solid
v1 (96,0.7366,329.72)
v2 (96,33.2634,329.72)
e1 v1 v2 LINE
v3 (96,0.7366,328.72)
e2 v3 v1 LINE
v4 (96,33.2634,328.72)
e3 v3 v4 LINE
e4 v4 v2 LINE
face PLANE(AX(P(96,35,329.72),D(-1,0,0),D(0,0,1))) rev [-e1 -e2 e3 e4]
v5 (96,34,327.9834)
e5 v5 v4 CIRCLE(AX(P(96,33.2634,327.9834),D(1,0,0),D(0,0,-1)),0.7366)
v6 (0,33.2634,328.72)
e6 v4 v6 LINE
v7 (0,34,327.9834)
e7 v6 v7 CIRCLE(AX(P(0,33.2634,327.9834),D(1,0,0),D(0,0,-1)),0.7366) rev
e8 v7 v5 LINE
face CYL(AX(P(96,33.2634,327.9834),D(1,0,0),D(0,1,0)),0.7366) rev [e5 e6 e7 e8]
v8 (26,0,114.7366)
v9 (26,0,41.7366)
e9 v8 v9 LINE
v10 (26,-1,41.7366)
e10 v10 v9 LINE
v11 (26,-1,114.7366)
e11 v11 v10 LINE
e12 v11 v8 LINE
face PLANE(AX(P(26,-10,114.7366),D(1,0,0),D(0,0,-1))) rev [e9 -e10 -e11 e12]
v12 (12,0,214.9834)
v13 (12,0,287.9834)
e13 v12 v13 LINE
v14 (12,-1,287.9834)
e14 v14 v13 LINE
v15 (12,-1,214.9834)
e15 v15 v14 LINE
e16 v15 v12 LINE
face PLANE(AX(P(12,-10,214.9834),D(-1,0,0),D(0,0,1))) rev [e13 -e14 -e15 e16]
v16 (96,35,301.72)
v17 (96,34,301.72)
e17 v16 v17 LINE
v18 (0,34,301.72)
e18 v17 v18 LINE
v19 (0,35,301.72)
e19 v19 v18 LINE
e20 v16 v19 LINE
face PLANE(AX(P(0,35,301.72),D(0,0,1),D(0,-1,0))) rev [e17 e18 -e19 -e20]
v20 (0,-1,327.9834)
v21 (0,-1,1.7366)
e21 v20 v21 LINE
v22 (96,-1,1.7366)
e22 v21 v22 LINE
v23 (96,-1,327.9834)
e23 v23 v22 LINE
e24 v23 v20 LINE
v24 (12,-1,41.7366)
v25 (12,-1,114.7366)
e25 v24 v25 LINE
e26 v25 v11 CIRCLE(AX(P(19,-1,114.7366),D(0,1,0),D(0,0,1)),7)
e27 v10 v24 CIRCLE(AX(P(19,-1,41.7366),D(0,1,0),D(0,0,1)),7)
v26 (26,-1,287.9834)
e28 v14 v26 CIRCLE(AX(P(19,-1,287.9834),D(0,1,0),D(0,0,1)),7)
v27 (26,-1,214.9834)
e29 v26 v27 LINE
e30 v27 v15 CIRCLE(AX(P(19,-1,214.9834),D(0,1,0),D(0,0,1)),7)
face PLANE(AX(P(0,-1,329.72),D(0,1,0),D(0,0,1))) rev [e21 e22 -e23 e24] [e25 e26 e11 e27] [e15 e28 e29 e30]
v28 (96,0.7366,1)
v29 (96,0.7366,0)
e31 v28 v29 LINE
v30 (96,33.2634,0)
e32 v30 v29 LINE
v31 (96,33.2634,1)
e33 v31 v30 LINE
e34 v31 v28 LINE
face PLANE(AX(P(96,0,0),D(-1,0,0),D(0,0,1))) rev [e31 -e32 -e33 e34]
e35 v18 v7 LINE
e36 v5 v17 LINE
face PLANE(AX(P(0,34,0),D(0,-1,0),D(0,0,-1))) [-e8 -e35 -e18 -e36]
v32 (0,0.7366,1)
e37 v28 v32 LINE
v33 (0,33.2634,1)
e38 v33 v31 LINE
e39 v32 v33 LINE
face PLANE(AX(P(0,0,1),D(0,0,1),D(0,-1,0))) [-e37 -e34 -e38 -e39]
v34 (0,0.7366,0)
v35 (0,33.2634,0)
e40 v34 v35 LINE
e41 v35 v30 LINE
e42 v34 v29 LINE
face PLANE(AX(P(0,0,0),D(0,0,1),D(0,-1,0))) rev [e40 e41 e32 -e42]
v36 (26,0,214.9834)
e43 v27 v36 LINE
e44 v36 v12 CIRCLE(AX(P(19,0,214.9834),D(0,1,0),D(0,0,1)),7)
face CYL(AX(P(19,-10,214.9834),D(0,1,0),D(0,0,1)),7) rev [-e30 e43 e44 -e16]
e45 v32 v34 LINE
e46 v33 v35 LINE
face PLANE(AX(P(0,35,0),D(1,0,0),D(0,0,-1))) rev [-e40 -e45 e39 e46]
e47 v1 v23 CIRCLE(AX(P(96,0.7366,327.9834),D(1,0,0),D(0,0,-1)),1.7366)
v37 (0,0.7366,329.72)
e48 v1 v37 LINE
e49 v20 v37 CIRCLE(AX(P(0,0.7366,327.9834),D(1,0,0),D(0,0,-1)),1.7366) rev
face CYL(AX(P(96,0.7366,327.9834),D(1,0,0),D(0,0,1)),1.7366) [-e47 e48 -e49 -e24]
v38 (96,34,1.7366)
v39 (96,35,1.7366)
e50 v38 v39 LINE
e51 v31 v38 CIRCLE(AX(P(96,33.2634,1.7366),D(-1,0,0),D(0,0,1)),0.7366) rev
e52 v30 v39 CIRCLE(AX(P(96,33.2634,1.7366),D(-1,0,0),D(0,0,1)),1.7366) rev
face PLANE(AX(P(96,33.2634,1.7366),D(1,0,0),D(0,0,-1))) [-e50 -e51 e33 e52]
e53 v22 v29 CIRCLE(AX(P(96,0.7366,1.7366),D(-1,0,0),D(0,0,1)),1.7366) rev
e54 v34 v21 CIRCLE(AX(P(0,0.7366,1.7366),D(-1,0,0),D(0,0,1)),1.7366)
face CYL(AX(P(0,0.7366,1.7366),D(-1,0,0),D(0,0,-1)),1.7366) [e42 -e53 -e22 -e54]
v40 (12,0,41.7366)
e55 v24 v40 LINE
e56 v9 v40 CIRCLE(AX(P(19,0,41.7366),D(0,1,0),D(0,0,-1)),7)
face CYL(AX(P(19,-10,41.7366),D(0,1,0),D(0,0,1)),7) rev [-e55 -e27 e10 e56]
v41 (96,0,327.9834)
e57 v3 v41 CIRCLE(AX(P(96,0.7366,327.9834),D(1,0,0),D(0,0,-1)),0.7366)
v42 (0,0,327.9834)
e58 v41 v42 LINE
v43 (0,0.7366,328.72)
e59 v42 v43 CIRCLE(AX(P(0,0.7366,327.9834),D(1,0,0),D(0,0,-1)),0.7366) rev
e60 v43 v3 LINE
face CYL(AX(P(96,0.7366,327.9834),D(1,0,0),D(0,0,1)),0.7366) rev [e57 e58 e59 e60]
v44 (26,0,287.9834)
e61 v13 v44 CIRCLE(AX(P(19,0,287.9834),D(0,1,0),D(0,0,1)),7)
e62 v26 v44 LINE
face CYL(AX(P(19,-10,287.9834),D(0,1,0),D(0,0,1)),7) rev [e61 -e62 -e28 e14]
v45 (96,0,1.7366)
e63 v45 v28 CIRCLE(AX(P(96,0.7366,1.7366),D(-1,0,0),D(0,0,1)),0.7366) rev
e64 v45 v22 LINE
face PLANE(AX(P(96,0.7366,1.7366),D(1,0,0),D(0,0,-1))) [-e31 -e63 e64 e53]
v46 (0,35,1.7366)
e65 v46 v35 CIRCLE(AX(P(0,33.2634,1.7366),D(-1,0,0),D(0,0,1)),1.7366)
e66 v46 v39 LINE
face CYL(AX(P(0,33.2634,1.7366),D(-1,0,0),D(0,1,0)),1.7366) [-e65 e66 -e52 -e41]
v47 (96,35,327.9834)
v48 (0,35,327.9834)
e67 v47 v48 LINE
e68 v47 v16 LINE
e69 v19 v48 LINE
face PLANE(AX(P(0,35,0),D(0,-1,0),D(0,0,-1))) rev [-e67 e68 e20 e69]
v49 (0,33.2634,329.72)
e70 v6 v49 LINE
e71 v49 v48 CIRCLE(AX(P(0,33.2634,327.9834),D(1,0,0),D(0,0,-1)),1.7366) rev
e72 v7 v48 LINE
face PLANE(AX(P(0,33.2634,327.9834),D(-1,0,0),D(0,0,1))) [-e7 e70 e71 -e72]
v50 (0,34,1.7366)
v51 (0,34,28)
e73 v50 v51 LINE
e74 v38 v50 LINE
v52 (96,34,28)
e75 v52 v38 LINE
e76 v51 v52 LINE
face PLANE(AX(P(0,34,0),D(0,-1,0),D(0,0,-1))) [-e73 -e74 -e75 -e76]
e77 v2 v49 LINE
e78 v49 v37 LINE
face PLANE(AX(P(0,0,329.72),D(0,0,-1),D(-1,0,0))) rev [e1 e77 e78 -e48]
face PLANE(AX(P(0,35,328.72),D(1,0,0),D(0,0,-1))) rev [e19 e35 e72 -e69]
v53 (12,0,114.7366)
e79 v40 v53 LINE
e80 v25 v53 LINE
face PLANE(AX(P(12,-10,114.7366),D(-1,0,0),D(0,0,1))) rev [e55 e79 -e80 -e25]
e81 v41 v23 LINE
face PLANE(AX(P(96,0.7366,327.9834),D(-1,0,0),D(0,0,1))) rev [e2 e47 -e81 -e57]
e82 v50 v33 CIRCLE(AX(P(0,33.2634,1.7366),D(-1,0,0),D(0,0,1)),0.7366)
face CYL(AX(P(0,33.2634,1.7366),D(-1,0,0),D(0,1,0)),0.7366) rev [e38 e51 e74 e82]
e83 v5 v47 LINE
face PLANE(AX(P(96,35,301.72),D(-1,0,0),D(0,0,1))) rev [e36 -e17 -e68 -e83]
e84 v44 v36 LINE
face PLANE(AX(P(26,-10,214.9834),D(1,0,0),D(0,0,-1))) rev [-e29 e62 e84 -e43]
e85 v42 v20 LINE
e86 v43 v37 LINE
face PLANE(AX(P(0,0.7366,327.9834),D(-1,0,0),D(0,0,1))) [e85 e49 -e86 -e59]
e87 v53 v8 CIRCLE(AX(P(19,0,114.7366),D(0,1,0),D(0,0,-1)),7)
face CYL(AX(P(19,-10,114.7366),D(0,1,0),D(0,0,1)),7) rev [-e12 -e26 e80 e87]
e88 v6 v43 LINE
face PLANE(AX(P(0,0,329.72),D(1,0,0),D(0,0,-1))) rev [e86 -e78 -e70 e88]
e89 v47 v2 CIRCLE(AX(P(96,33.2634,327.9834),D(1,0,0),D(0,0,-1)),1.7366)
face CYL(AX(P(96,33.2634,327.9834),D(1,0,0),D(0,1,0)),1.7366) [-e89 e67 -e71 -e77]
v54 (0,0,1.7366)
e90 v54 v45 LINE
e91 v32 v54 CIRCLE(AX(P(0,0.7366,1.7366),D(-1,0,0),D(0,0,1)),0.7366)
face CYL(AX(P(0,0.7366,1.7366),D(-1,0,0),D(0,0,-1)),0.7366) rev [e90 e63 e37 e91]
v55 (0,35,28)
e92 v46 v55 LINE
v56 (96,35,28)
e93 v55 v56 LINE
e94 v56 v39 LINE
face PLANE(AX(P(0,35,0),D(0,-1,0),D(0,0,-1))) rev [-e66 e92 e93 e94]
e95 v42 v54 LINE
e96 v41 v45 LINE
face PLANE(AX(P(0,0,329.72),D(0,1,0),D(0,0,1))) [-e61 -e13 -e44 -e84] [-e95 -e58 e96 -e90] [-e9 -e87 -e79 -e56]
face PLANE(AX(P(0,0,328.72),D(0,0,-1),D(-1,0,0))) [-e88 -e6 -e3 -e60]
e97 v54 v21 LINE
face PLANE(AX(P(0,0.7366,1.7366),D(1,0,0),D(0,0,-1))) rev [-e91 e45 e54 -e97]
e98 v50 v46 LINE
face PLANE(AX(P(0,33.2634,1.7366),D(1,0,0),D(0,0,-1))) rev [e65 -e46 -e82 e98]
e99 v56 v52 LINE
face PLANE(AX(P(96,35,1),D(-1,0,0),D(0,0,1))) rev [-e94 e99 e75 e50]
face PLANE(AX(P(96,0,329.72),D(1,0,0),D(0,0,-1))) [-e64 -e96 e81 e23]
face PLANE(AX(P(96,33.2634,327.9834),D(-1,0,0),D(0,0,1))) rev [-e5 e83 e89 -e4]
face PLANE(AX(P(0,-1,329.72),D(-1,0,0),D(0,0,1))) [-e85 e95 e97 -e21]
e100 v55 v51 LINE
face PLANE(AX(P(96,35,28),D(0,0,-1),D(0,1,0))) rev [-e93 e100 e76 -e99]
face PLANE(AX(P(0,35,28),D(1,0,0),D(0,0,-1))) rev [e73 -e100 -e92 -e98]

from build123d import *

# Parameters (mm, degrees)
SKETCH1_W                    = 96
SKETCH1_H                    = 1
BASE_FLANGE1_DEPTH           = 329.72
EDGE_FLANGE1_STRIP_W         = 5.4732
EDGE_FLANGE1_STRIP_H         = 1
EDGE_FLANGE1_STRIP_CUT_DEPTH = 96
EDGE_FLANGE1_DEPTH           = 96
EDGE_FLANGE2_STRIP_W         = 5.4732
EDGE_FLANGE2_STRIP_H         = 1
EDGE_FLANGE2_STRIP_CUT_DEPTH = 96
EDGE_FLANGE2_DEPTH           = 96
EDGE_FLANGE3_STRIP_W         = 5.4732
EDGE_FLANGE3_STRIP_H         = 1
EDGE_FLANGE3_STRIP_CUT_DEPTH = 96
EDGE_FLANGE3_DEPTH           = 96
EDGE_FLANGE4_STRIP_W         = 5.4732
EDGE_FLANGE4_STRIP_H         = 1
EDGE_FLANGE4_STRIP_CUT_DEPTH = 96
EDGE_FLANGE4_DEPTH           = 96
CUT_EXTRUDE1_DEPTH           = 10


# Sheet-metal steps are written as plain solids
with BuildPart() as part:
    # Sketch1 → Base-Flange1 (new body)
    with BuildSketch(Plane.XY):
        with Locations((48, -0.5)):
            Rectangle(SKETCH1_W, SKETCH1_H)
    extrude(amount=BASE_FLANGE1_DEPTH)

    # Edge-Flange1 strip (across the edge) → Edge-Flange1 strip cut (cut)
    with BuildSketch(Plane(origin=(0, 0, 329.72), x_dir=(0, 0, -1), z_dir=(1, 0, 0))):
        with Locations((-1, -0.5)):
            Rectangle(EDGE_FLANGE1_STRIP_W, EDGE_FLANGE1_STRIP_H)
    extrude(amount=EDGE_FLANGE1_STRIP_CUT_DEPTH, mode=Mode.SUBTRACT)

    # Edge-Flange1 section (across the edge) → Edge-Flange1 (add)
    with BuildSketch(Plane(origin=(0, 0, 329.72), x_dir=(0, 0, -1), z_dir=(1, 0, 0))):
        with BuildLine():
            Line((0, 0.7366), (0, 35))
            Line((0, 35), (1, 35))
            Line((1, 35), (1, 0.7366))
            ThreePointArc((1, 0.7366), (1.215745145, 0.215745145), (1.7366, 0))
            Line((1.7366, 0), (1.7366, -1))
            ThreePointArc((1.7366, -1), (0.508638364, -0.491361636), (0, 0.7366))
        make_face()
    extrude(amount=EDGE_FLANGE1_DEPTH)

    # Edge-Flange2 strip (across the edge) → Edge-Flange2 strip cut (cut)
    with BuildSketch(Plane.ZY.offset(-96)):
        with Locations((-1, -0.5)):
            Rectangle(EDGE_FLANGE2_STRIP_W, EDGE_FLANGE2_STRIP_H)
    extrude(amount=EDGE_FLANGE2_STRIP_CUT_DEPTH, mode=Mode.SUBTRACT)

    # Edge-Flange2 section (across the edge) → Edge-Flange2 (add)
    with BuildSketch(Plane.ZY.offset(-96)):
        with BuildLine():
            Line((0, 0.7366), (0, 35))
            Line((0, 35), (1, 35))
            Line((1, 35), (1, 0.7366))
            ThreePointArc((1, 0.7366), (1.215745145, 0.215745145), (1.7366, 0))
            Line((1.7366, 0), (1.7366, -1))
            ThreePointArc((1.7366, -1), (0.508638364, -0.491361636), (0, 0.7366))
        make_face()
    extrude(amount=EDGE_FLANGE2_DEPTH)

    # Edge-Flange3 strip (across the edge) → Edge-Flange3 strip cut (cut)
    with BuildSketch(Plane(origin=(0, 35, 328.72), x_dir=(0, -1, 0), z_dir=(1, 0, 0))):
        with Locations((-1, -0.5)):
            Rectangle(EDGE_FLANGE3_STRIP_W, EDGE_FLANGE3_STRIP_H)
    extrude(amount=EDGE_FLANGE3_STRIP_CUT_DEPTH, mode=Mode.SUBTRACT)

    # Edge-Flange3 section (across the edge) → Edge-Flange3 (add)
    with BuildSketch(Plane(origin=(0, 35, 328.72), x_dir=(0, -1, 0), z_dir=(1, 0, 0))):
        with BuildLine():
            Line((0, 0.7366), (0, 27))
            Line((0, 27), (1, 27))
            Line((1, 27), (1, 0.7366))
            ThreePointArc((1, 0.7366), (1.215745145, 0.215745145), (1.7366, 0))
            Line((1.7366, 0), (1.7366, -1))
            ThreePointArc((1.7366, -1), (0.508638364, -0.491361636), (0, 0.7366))
        make_face()
    extrude(amount=EDGE_FLANGE3_DEPTH)

    # Edge-Flange4 strip (across the edge) → Edge-Flange4 strip cut (cut)
    with BuildSketch(Plane(origin=(96, 35, 1), x_dir=(0, -1, 0), z_dir=(-1, 0, 0))):
        with Locations((-1, -0.5)):
            Rectangle(EDGE_FLANGE4_STRIP_W, EDGE_FLANGE4_STRIP_H)
    extrude(amount=EDGE_FLANGE4_STRIP_CUT_DEPTH, mode=Mode.SUBTRACT)

    # Edge-Flange4 section (across the edge) → Edge-Flange4 (add)
    with BuildSketch(Plane(origin=(96, 35, 1), x_dir=(0, -1, 0), z_dir=(-1, 0, 0))):
        with BuildLine():
            Line((0, 0.7366), (0, 27))
            Line((0, 27), (1, 27))
            Line((1, 27), (1, 0.7366))
            ThreePointArc((1, 0.7366), (1.215745145, 0.215745145), (1.7366, 0))
            Line((1.7366, 0), (1.7366, -1))
            ThreePointArc((1.7366, -1), (0.508638364, -0.491361636), (0, 0.7366))
        make_face()
    extrude(amount=EDGE_FLANGE4_DEPTH)

    # Sketch22 → Cut-Extrude1 (cut)
    with BuildSketch(Plane(origin=(0, 0, 0), x_dir=(1, 0, 0), z_dir=(0, 1, 0))):
        with BuildLine():
            Line((26, -214.9834), (26, -287.9834))
            ThreePointArc((26, -287.9834), (19, -294.9834), (12, -287.9834))
            Line((12, -287.9834), (12, -214.9834))
            ThreePointArc((12, -214.9834), (19, -207.9834), (26, -214.9834))
        make_face()
        with BuildLine():
            Line((26, -114.7366), (26, -41.7366))
            ThreePointArc((26, -41.7366), (19, -34.7366), (12, -41.7366))
            Line((12, -41.7366), (12, -114.7366))
            ThreePointArc((12, -114.7366), (19, -121.7366), (26, -114.7366))
        make_face()
    extrude(amount=-CUT_EXTRUDE1_DEPTH, mode=Mode.SUBTRACT)


solid = part.part
